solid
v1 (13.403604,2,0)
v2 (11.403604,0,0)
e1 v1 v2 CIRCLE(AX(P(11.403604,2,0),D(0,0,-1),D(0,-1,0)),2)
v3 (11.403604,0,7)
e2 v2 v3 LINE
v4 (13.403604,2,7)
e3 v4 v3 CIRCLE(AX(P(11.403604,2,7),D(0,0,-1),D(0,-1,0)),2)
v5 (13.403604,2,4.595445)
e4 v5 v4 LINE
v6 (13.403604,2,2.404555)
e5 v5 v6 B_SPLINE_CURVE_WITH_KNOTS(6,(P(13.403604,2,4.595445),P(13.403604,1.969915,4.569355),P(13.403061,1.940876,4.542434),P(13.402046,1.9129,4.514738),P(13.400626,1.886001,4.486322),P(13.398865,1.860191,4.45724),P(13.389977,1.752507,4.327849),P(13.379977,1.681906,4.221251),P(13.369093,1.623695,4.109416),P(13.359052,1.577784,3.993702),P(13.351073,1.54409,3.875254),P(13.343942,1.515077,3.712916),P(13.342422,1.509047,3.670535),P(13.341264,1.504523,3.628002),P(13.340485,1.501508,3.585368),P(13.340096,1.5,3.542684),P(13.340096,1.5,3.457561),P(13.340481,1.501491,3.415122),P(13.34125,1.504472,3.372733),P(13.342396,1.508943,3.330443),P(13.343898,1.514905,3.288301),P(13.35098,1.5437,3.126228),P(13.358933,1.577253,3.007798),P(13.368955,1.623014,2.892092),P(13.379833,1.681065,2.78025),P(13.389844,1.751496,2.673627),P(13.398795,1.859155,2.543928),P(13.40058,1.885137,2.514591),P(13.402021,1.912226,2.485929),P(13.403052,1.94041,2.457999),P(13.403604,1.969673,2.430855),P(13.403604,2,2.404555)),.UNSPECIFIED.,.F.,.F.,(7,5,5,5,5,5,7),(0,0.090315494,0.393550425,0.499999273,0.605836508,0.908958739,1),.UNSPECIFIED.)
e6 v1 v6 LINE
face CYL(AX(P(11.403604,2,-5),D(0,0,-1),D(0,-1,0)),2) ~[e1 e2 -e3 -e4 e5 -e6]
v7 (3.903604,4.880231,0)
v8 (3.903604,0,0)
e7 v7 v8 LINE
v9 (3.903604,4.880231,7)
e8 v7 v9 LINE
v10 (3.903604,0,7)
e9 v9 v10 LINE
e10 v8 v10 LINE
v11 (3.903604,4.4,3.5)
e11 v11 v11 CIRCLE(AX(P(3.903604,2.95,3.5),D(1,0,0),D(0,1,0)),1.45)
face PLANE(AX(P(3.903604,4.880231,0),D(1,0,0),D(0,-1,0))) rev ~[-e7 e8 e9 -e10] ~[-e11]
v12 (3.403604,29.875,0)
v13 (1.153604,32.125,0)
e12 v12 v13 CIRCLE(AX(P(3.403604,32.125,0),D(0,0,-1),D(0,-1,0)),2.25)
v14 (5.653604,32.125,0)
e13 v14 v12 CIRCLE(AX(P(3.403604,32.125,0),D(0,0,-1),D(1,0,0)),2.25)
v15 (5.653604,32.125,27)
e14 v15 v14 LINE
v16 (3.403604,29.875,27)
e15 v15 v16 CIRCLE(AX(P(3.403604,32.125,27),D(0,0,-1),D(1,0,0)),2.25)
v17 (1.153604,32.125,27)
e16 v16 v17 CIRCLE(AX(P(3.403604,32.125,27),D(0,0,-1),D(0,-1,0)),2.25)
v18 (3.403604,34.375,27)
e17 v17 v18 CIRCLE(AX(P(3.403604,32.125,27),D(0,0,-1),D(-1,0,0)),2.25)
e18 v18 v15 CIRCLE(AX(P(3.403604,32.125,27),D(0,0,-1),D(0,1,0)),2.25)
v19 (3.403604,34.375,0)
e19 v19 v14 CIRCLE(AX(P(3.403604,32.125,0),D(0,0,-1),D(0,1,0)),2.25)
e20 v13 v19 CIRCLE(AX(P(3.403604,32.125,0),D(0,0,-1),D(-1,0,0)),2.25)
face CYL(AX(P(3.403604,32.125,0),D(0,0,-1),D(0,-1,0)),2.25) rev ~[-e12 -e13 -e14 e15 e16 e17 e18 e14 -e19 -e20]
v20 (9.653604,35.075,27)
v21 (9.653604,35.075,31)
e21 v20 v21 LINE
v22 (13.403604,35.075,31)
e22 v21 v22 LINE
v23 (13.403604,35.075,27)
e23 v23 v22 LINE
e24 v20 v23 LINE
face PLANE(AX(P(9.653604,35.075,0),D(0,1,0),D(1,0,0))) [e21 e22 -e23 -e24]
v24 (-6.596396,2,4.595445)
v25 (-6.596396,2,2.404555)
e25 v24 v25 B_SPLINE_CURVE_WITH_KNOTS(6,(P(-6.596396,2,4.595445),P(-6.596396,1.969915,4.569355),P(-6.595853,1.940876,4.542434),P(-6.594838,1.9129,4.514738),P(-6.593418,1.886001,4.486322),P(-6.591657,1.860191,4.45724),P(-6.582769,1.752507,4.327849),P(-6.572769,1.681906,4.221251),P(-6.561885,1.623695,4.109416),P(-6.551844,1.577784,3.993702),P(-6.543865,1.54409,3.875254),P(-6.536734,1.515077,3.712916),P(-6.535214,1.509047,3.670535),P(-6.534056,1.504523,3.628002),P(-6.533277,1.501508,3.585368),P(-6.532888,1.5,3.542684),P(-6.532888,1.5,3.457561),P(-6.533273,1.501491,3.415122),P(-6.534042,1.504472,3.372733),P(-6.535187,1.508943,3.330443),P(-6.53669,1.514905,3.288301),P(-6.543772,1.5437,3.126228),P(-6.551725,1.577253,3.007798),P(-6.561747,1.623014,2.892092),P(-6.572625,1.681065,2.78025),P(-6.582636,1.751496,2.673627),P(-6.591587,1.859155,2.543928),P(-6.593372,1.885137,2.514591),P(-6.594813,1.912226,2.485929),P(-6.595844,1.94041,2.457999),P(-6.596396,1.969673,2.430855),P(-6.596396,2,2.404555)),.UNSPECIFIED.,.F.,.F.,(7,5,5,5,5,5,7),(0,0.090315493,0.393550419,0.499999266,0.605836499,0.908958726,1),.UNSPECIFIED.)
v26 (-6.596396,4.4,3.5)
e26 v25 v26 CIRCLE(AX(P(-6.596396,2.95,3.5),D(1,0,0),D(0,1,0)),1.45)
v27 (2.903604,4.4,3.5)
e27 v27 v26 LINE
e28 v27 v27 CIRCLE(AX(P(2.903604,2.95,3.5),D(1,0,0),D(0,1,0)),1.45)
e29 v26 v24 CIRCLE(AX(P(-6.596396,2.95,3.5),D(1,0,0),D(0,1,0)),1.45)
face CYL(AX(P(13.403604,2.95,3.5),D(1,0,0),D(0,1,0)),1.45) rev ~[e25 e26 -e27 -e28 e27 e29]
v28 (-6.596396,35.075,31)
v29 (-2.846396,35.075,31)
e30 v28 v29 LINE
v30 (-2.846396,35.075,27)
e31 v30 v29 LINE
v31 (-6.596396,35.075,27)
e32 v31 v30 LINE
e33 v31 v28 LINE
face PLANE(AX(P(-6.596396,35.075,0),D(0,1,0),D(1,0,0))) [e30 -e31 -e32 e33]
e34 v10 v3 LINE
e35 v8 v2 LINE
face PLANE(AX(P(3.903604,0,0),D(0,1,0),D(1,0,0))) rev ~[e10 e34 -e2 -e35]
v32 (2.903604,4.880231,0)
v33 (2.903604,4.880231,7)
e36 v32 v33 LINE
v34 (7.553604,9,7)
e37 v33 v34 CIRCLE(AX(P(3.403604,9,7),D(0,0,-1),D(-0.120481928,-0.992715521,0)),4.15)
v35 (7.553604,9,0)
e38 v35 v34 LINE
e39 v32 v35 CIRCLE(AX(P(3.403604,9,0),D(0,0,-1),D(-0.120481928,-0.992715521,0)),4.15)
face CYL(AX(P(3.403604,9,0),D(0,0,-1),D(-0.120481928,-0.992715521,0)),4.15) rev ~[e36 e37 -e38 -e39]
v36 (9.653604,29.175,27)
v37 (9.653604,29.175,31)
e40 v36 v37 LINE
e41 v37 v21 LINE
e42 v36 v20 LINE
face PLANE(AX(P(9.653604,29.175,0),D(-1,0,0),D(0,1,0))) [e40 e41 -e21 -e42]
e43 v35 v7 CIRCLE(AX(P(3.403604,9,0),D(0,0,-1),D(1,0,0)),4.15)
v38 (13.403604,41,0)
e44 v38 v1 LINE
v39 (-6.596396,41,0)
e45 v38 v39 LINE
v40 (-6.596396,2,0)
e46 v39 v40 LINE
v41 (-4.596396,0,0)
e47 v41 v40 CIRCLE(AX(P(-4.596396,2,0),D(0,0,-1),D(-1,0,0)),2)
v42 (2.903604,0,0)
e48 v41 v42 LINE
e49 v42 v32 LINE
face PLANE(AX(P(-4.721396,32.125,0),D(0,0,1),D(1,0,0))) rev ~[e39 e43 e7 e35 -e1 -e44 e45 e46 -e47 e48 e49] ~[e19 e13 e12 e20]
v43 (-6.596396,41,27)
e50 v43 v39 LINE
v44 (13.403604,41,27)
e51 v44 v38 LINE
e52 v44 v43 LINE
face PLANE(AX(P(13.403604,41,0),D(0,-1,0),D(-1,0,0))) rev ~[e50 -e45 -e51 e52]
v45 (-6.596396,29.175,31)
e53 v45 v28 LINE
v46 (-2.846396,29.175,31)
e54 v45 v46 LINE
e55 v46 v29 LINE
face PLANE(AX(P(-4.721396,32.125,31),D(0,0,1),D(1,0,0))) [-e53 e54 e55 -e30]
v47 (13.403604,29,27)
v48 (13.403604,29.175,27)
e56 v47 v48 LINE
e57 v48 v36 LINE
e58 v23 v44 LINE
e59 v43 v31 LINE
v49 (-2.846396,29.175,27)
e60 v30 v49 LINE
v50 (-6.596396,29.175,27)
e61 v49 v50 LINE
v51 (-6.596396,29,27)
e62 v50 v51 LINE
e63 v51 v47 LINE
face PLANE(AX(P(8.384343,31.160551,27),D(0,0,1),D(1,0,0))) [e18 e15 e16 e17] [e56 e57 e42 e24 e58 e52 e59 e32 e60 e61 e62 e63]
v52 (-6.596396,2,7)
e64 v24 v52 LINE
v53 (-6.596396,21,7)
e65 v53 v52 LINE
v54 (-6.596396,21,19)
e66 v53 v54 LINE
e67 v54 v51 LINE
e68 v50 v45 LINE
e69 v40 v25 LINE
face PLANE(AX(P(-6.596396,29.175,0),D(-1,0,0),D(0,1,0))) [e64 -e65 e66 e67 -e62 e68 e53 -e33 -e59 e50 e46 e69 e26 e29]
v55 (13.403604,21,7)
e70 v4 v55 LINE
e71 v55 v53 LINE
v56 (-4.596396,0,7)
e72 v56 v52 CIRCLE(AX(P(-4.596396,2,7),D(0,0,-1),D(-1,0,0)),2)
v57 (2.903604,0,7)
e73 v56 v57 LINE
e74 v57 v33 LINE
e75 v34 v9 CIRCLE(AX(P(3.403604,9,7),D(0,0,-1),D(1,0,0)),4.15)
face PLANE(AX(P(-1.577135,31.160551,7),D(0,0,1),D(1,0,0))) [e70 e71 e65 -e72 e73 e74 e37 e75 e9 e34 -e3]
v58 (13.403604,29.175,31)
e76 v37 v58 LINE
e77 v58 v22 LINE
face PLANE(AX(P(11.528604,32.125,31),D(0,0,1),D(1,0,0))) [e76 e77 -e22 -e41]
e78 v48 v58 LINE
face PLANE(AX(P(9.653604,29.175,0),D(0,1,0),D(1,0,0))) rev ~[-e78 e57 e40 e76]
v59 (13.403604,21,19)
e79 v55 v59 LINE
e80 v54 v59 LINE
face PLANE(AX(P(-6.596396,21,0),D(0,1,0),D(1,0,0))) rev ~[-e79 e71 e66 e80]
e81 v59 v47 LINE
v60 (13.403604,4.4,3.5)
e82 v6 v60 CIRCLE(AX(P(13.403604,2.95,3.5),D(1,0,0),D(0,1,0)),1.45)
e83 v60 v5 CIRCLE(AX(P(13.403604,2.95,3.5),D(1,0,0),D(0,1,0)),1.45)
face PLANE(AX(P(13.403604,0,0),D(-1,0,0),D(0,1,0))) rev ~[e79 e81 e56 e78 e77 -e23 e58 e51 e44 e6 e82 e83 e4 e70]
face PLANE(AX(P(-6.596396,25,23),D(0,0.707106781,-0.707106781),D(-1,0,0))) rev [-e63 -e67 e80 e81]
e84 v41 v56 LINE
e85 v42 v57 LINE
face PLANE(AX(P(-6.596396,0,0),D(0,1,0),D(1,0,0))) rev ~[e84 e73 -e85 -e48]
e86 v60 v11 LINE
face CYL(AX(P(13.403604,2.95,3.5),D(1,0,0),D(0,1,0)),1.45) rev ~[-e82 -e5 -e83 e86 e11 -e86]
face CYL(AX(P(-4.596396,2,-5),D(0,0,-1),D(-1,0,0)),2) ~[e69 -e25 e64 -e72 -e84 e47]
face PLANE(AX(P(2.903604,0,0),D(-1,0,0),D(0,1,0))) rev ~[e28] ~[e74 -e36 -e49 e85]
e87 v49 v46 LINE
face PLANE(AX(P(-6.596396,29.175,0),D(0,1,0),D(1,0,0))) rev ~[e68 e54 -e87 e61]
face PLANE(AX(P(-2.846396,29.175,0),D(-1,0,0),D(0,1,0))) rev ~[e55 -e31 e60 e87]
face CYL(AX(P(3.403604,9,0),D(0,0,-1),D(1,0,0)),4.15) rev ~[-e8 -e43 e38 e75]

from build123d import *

# Parameters (mm, degrees)
F1_DEPTH    = 7
F2_R        = 1.45
F3_DEPTH    = 25
F4_T1_DEPTH = 17
F5_DEPTH    = 27
F0_W        = 3.75
F0_H        = 5.9
F6_DEPTH    = 31
F7_SIZE     = 8


# Not quite as in the source:
# - a fillet or chamfer that OpenCascade refuses, or shapes differently, is made with other operations: its cross-section is extruded or revolved along the edge and cut away or added


with BuildPart() as f1:
    # F0 (on Top) → F1 (new body)
    with BuildSketch(Plane.XY):
        with BuildLine():
            Line((-6.5963959517, 29.175), (-6.5963959517, 21))
            Line((-6.5963959517, 21), (3.4036040483, 21))
            Line((3.4036040483, 21), (3.4036040483, 29.875))
            ThreePointArc((3.4036040483, 29.875), (1.8126137907, 30.5340097423), (1.1536040483, 32.125))
            ThreePointArc((1.1536040483, 32.125), (1.8126137907, 33.7159902577), (3.4036040483, 34.375))
            Line((3.4036040483, 34.375), (3.4036040483, 41))
            Line((3.4036040483, 41), (-6.5963959517, 41))
            Line((-6.5963959517, 41), (-6.5963959517, 35.075))
            Line((-6.5963959517, 35.075), (-2.8463959517, 35.075))
            Line((-2.8463959517, 35.075), (-2.8463959517, 29.175))
            Line((-2.8463959517, 29.175), (-6.5963959517, 29.175))
        make_face()
        with BuildLine():
            Line((3.4036040483, 29.875), (3.4036040483, 21))
            Line((3.4036040483, 21), (13.4036040483, 21))
            Line((13.4036040483, 21), (13.4036040483, 29.175))
            Line((13.4036040483, 29.175), (9.6536040483, 29.175))
            Line((9.6536040483, 29.175), (9.6536040483, 35.075))
            Line((9.6536040483, 35.075), (13.4036040483, 35.075))
            Line((13.4036040483, 35.075), (13.4036040483, 41))
            Line((13.4036040483, 41), (3.4036040483, 41))
            Line((3.4036040483, 41), (3.4036040483, 34.375))
            ThreePointArc((3.4036040483, 34.375), (4.994594306, 33.7159902577), (5.6536040483, 32.125))
            ThreePointArc((5.6536040483, 32.125), (4.994594306, 30.5340097423), (3.4036040483, 29.875))
        make_face()
        with BuildLine():
            Line((-6.5963959517, 21), (-6.5963959517, 0))
            Line((-6.5963959517, 0), (2.9036040483, 0))
            Line((2.9036040483, 0), (2.9036040483, 1.2661458509))
            ThreePointArc((2.9036040483, 1.2661458509), (-1.8967497135, 14.6540914389), (11.1536040483, 9))
            ThreePointArc((11.1536040483, 9), (9.0576954873, 3.6996462382), (3.9036040483, 1.2661458509))
            Line((3.9036040483, 1.2661458509), (3.9036040483, 0))
            Line((3.9036040483, 0), (13.4036040483, 0))
            Line((13.4036040483, 0), (13.4036040483, 21))
            Line((13.4036040483, 21), (3.4036040483, 21))
            Line((3.4036040483, 21), (-6.5963959517, 21))
        make_face()
        with BuildLine():
            ThreePointArc((11.1536040483, 9), (-1.8967497135, 14.6540914389), (2.9036040483, 1.2661458509))
            Line((2.9036040483, 1.2661458509), (2.9036040483, 4.880230589))
            ThreePointArc((2.9036040483, 4.880230589), (0.6515593539, 12.1062437123), (7.5536040483, 9))
            ThreePointArc((7.5536040483, 9), (6.5098477606, 6.2479553056), (3.9036040483, 4.880230589))
            Line((3.9036040483, 4.880230589), (3.9036040483, 1.2661458509))
            ThreePointArc((3.9036040483, 1.2661458509), (9.0576954873, 3.6996462382), (11.1536040483, 9))
        make_face()
    extrude(amount=F1_DEPTH)

    # F2 (on face) → F3 (cut)
    with BuildSketch(Plane.YZ.offset(13.4036040483)):
        with Locations((2.95, 3.5)):
            Circle(F2_R)
    extrude(amount=-F3_DEPTH, mode=Mode.SUBTRACT)

    # F4: fillet of radius 2 on 2 edges, made by hand

    # F4_s2 → F4_t1 (cut)
    with BuildSketch(Plane.XY.offset(-5)):
        with BuildLine():
            ThreePointArc((11.4036040483, 0), (12.8178176107, 0.5857864376), (13.4036040483, 2))
            Line((13.4036040483, 2), (13.4036040483, 0))
            Line((13.4036040483, 0), (11.4036040483, 0))
        make_face()
        with BuildLine():
            ThreePointArc((-6.5963959517, 2), (-6.010609514, 0.5857864376), (-4.5963959517, 0))
            Line((-4.5963959517, 0), (-6.5963959517, 0))
            Line((-6.5963959517, 0), (-6.5963959517, 2))
        make_face()
    extrude(amount=F4_T1_DEPTH, mode=Mode.SUBTRACT)

    # F0 (on Top) → F5 (join)
    with BuildSketch(Plane.XY):
        with BuildLine():
            Line((3.4036040483, 29.875), (3.4036040483, 21))
            Line((3.4036040483, 21), (13.4036040483, 21))
            Line((13.4036040483, 21), (13.4036040483, 29.175))
            Line((13.4036040483, 29.175), (9.6536040483, 29.175))
            Line((9.6536040483, 29.175), (9.6536040483, 35.075))
            Line((9.6536040483, 35.075), (13.4036040483, 35.075))
            Line((13.4036040483, 35.075), (13.4036040483, 41))
            Line((13.4036040483, 41), (3.4036040483, 41))
            Line((3.4036040483, 41), (3.4036040483, 34.375))
            ThreePointArc((3.4036040483, 34.375), (4.994594306, 33.7159902577), (5.6536040483, 32.125))
            ThreePointArc((5.6536040483, 32.125), (4.994594306, 30.5340097423), (3.4036040483, 29.875))
        make_face()
        with BuildLine():
            Line((-6.5963959517, 29.175), (-6.5963959517, 21))
            Line((-6.5963959517, 21), (3.4036040483, 21))
            Line((3.4036040483, 21), (3.4036040483, 29.875))
            ThreePointArc((3.4036040483, 29.875), (1.8126137907, 30.5340097423), (1.1536040483, 32.125))
            ThreePointArc((1.1536040483, 32.125), (1.8126137907, 33.7159902577), (3.4036040483, 34.375))
            Line((3.4036040483, 34.375), (3.4036040483, 41))
            Line((3.4036040483, 41), (-6.5963959517, 41))
            Line((-6.5963959517, 41), (-6.5963959517, 35.075))
            Line((-6.5963959517, 35.075), (-2.8463959517, 35.075))
            Line((-2.8463959517, 35.075), (-2.8463959517, 29.175))
            Line((-2.8463959517, 29.175), (-6.5963959517, 29.175))
        make_face()
    extrude(amount=F5_DEPTH)

    # F0 (on Top) → F6 (join)
    with BuildSketch(Plane.XY):
        with Locations((-4.7213959517, 32.125)):
            Rectangle(F0_W, F0_H)
        with Locations((11.5286040483, 32.125)):
            Rectangle(F0_W, F0_H)
    extrude(amount=F6_DEPTH)

    # F7
    f7_edges = [f1.edges().sort_by_distance(p)[0] for p in [
        (3.403604, 21, 27),
    ]]
    chamfer(f7_edges, length=F7_SIZE)


solid = f1.part
